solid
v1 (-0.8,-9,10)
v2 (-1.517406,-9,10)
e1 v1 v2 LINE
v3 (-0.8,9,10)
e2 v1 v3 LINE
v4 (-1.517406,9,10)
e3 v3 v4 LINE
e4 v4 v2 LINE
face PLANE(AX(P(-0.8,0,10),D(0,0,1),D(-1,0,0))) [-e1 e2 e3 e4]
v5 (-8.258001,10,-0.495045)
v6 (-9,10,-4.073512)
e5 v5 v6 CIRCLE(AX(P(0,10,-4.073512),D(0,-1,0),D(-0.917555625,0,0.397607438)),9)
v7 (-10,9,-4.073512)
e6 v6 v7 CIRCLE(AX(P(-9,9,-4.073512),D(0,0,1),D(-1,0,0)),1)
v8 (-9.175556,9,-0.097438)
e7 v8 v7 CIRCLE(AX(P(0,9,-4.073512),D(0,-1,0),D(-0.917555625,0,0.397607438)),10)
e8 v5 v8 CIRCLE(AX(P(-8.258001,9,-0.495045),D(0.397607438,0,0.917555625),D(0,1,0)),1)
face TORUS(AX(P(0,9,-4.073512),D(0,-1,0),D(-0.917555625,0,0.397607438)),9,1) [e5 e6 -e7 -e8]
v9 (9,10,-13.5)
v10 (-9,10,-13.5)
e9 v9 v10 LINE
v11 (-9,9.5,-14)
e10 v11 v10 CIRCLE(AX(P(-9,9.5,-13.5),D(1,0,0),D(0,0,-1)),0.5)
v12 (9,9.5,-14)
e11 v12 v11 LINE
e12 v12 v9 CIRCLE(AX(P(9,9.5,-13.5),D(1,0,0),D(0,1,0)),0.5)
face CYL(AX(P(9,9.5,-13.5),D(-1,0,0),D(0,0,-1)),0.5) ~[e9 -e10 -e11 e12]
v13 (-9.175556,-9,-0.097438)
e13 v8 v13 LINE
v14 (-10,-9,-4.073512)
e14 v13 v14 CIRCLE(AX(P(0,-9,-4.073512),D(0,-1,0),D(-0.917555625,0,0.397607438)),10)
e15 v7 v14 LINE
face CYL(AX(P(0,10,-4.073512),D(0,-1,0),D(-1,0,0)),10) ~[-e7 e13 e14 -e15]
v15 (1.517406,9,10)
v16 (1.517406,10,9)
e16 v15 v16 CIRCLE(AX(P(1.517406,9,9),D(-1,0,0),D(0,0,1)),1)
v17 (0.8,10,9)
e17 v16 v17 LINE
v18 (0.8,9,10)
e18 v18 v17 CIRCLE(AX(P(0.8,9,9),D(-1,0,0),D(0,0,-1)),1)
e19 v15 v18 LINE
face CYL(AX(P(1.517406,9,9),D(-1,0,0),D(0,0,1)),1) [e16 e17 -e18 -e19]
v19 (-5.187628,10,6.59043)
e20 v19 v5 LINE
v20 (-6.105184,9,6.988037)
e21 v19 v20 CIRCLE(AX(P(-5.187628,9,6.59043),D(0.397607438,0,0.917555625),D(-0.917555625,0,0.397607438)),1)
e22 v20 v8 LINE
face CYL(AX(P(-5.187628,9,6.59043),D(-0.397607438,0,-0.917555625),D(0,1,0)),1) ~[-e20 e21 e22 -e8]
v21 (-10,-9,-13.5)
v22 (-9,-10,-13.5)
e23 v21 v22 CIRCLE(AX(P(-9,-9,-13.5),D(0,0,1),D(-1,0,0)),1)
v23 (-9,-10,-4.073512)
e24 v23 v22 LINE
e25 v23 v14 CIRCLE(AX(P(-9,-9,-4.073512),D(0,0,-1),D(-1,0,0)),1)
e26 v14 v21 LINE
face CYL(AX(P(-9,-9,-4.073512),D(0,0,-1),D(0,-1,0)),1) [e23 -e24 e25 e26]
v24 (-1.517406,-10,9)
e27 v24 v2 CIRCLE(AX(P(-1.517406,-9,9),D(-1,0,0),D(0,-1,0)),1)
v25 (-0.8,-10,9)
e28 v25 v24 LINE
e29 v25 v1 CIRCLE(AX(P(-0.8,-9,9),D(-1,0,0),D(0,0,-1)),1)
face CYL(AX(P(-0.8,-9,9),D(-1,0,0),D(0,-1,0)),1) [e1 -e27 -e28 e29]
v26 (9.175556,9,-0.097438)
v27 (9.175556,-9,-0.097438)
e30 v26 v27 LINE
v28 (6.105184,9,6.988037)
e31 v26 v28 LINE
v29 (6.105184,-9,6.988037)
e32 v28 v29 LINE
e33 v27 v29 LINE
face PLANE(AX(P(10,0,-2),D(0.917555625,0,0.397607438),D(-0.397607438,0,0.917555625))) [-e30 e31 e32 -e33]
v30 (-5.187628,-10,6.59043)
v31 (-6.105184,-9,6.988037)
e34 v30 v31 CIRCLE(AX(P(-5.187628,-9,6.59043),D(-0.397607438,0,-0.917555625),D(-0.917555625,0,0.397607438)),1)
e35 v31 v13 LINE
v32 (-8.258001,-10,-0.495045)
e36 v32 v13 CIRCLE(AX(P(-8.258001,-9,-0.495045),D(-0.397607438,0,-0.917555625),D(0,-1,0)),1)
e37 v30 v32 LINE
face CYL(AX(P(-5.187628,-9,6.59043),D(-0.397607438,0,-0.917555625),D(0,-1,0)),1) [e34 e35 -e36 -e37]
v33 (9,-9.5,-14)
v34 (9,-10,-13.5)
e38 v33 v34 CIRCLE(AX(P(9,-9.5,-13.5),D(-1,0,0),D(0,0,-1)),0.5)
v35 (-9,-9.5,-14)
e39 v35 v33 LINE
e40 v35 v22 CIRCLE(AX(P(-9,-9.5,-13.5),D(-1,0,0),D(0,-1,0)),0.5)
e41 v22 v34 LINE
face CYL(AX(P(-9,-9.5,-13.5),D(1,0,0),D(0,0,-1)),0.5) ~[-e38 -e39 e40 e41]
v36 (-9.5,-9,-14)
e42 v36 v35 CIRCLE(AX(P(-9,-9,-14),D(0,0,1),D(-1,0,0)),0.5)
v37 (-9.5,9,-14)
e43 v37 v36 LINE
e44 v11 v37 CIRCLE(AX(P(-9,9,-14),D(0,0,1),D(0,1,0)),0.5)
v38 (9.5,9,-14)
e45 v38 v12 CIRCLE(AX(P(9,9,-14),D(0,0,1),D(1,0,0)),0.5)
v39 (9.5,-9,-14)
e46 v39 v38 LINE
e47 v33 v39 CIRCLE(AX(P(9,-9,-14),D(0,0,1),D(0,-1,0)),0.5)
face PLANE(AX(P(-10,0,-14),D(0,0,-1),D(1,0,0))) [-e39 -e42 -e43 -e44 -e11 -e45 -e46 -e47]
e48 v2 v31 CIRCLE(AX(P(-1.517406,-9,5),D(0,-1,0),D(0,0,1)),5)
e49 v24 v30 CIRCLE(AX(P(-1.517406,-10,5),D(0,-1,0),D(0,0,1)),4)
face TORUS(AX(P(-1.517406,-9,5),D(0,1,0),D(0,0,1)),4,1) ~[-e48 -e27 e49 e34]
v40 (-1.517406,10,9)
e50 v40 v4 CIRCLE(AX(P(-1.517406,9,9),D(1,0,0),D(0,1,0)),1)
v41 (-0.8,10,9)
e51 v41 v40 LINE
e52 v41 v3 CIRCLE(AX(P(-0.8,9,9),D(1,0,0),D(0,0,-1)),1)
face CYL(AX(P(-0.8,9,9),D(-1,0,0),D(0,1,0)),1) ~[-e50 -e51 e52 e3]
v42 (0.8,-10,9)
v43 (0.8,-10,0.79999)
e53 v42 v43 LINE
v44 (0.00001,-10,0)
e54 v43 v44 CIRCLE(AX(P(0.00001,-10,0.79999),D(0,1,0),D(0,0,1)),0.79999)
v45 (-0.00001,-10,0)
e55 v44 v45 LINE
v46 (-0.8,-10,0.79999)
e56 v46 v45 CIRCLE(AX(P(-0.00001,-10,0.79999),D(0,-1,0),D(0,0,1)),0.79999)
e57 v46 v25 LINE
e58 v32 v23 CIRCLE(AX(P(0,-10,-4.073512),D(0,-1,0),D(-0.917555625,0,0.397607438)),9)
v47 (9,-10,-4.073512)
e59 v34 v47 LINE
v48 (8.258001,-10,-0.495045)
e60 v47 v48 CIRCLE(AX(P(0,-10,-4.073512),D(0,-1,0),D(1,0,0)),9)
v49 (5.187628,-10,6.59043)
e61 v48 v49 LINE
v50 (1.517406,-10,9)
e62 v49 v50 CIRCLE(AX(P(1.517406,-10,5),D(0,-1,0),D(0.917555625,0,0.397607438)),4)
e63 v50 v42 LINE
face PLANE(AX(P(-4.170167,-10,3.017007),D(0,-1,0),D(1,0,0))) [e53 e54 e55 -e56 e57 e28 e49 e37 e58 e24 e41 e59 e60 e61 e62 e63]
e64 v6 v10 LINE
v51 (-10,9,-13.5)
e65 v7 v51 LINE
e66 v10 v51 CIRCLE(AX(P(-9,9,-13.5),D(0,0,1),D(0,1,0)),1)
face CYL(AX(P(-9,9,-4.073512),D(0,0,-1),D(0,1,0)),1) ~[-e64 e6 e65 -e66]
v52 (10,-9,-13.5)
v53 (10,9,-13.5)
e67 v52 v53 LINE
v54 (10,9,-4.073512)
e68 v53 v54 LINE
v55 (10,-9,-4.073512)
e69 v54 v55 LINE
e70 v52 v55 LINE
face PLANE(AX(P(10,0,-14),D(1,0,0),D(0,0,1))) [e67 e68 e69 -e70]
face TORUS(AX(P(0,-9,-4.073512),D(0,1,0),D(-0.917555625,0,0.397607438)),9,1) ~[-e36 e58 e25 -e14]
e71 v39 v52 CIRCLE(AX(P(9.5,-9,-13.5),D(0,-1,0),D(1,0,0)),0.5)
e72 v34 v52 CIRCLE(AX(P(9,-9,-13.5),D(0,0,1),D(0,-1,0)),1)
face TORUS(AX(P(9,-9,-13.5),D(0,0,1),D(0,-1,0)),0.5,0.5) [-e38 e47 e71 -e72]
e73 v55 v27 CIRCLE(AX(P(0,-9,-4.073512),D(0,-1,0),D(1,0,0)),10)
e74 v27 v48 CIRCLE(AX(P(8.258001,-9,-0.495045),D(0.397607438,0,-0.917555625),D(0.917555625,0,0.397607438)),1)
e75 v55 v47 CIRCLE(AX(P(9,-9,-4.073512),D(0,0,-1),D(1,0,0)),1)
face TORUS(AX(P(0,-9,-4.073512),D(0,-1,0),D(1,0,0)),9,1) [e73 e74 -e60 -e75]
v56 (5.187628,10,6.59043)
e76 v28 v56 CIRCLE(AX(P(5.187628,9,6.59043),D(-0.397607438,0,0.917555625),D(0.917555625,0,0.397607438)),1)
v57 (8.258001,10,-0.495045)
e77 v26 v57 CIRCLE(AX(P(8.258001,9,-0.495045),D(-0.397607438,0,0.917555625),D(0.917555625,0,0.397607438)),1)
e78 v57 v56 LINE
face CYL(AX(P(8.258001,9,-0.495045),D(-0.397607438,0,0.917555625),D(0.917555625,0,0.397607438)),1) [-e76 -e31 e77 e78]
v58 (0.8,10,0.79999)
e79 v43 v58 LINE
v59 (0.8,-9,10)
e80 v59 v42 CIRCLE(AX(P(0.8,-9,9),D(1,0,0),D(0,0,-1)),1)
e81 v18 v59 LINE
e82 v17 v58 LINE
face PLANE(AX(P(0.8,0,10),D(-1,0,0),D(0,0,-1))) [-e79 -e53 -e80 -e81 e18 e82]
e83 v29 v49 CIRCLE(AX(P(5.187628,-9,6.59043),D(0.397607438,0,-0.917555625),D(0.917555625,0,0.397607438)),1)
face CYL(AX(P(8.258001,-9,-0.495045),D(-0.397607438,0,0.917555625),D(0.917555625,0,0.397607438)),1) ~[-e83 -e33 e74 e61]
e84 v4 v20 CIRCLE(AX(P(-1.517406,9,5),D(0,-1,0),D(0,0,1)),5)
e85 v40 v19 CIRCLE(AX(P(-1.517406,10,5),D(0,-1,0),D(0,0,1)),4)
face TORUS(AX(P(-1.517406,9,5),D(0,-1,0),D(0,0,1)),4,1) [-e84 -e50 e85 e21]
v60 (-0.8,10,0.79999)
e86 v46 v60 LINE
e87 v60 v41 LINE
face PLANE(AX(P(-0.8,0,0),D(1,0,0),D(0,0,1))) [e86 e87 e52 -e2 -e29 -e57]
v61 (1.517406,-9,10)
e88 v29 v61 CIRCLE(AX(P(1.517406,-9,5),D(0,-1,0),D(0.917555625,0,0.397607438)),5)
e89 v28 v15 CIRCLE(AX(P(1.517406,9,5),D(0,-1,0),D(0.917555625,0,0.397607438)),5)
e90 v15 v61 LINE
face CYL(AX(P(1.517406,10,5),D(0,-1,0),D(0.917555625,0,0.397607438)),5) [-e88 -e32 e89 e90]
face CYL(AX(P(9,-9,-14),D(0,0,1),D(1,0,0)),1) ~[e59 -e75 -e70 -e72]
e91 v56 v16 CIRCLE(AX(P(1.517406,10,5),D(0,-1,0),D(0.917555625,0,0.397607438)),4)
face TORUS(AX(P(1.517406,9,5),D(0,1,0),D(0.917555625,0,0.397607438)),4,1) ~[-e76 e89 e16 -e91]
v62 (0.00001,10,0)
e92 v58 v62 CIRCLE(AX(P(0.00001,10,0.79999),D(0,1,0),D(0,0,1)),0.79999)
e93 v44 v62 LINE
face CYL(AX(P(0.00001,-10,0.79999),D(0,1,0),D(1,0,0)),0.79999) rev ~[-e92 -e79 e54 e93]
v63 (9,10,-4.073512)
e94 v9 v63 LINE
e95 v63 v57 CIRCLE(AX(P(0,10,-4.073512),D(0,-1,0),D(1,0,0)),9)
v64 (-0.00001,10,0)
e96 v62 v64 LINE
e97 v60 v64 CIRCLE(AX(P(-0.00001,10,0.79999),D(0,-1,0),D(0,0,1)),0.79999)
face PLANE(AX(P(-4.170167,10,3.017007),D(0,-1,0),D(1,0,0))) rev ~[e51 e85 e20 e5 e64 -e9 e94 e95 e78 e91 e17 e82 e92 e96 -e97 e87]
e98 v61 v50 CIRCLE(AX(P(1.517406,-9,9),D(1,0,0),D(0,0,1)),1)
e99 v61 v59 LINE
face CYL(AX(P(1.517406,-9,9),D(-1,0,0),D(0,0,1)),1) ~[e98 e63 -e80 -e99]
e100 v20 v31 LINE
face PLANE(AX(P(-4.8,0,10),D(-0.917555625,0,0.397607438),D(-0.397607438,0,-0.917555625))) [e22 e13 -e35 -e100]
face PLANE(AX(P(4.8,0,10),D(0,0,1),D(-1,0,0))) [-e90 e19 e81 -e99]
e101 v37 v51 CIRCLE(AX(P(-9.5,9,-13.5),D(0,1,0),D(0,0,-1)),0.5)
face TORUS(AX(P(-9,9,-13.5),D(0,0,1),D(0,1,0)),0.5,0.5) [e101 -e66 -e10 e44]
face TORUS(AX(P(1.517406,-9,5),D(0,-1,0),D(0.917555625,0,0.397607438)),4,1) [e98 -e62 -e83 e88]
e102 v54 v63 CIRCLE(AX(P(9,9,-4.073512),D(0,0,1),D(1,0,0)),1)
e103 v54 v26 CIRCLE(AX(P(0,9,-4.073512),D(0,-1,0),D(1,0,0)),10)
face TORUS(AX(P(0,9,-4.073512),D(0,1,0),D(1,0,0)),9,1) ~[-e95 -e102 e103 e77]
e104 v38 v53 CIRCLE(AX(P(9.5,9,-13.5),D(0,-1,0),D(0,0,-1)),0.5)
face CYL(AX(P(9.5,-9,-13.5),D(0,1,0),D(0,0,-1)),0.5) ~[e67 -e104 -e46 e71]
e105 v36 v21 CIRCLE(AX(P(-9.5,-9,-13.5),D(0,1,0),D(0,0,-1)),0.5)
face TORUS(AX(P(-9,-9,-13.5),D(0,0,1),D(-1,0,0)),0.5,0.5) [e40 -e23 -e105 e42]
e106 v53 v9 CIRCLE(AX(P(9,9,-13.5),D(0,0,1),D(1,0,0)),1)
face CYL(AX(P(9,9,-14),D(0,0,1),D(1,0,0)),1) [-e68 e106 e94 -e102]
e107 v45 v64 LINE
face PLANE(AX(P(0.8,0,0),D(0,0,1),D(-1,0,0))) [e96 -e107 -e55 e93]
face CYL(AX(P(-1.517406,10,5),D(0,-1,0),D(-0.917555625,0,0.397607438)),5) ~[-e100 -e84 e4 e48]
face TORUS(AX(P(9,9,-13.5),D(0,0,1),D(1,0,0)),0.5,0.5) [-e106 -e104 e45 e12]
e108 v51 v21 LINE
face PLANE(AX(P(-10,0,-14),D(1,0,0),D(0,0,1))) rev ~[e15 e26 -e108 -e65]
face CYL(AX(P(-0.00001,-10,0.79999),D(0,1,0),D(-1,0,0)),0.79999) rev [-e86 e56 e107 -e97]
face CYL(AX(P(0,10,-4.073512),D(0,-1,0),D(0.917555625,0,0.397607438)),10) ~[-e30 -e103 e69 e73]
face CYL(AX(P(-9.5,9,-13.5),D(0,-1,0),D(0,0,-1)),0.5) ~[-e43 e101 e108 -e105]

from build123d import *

# Parameters (mm, degrees)
F0_W     = 10
F0_H     = 12
F1_DEPTH = 10
F2_R     = 10
F3_R     = 5
F4_R     = 1
F5_R     = 0.79999
F6_R     = 0.5


# Not quite as in the source:
# - a fillet or chamfer is up to 0.001 mm smaller than in the source, because OpenCascade refuses the exact size
# - a feature names something its author has since deleted; it is built from what else it names


with BuildPart() as f1:
    # F0 (on Front) → F1 (new body, symmetric)
    with BuildSketch(Plane.XZ):
        Polygon((-0.8, 10), (-4.8, 10), (-10, -2), (0, -2), (0, 0), (-0.8, 0), align=None)
        Polygon((0, 0), (0, -2), (10, -2), (4.8, 10), (0.8, 10), (0.8, 0), align=None)
        with Locations((-5, -8)):
            Rectangle(F0_W, F0_H)
        with Locations((5, -8)):
            Rectangle(F0_W, F0_H)
    extrude(amount=F1_DEPTH, both=True)

    # F2
    f2_edges = [f1.edges().sort_by_distance(p)[0] for p in [
        (10, 0, -2),
        (-10, 0, -2),
    ]]
    fillet(f2_edges, radius=F2_R)

    # F3
    f3_edges = [f1.edges().sort_by_distance(p)[0] for p in [
        (4.8, 0, 10),
        (-4.8, 0, 10),
    ]]
    fillet(f3_edges, radius=F3_R)

    # F4
    f4_edges = [f1.edges().sort_by_distance(p)[0] for p in [
        (7.64037, 10, 3.4453),
        (7.64037, -10, 3.4453),
        (-7.64037, 10, 3.4453),
        (-7.64037, -10, 3.4453),
    ]]
    fillet(f4_edges, radius=F4_R)

    # F5 (radius 0.8 in the source; OpenCascade refuses exactly that, so slightly less here)
    f5_edges = [f1.edges().sort_by_distance(p)[0] for p in [
        (-0.8, 0, 0),
        (0.8, 0, 0),
    ]]
    fillet(f5_edges, radius=F5_R)

    # F6
    f6_edges = [f1.edges().sort_by_distance(p)[0] for p in [
        (-10, 0, -14),
        (-9.707107, 9.707107, -14),
        (-9.707107, -9.707107, -14),
        (0, 10, -14),
        (0, -10, -14),
        (9.707107, 9.707107, -14),
        (9.707107, -9.707107, -14),
        (10, 0, -14),
    ]]
    fillet(f6_edges, radius=F6_R)


solid = f1.part
